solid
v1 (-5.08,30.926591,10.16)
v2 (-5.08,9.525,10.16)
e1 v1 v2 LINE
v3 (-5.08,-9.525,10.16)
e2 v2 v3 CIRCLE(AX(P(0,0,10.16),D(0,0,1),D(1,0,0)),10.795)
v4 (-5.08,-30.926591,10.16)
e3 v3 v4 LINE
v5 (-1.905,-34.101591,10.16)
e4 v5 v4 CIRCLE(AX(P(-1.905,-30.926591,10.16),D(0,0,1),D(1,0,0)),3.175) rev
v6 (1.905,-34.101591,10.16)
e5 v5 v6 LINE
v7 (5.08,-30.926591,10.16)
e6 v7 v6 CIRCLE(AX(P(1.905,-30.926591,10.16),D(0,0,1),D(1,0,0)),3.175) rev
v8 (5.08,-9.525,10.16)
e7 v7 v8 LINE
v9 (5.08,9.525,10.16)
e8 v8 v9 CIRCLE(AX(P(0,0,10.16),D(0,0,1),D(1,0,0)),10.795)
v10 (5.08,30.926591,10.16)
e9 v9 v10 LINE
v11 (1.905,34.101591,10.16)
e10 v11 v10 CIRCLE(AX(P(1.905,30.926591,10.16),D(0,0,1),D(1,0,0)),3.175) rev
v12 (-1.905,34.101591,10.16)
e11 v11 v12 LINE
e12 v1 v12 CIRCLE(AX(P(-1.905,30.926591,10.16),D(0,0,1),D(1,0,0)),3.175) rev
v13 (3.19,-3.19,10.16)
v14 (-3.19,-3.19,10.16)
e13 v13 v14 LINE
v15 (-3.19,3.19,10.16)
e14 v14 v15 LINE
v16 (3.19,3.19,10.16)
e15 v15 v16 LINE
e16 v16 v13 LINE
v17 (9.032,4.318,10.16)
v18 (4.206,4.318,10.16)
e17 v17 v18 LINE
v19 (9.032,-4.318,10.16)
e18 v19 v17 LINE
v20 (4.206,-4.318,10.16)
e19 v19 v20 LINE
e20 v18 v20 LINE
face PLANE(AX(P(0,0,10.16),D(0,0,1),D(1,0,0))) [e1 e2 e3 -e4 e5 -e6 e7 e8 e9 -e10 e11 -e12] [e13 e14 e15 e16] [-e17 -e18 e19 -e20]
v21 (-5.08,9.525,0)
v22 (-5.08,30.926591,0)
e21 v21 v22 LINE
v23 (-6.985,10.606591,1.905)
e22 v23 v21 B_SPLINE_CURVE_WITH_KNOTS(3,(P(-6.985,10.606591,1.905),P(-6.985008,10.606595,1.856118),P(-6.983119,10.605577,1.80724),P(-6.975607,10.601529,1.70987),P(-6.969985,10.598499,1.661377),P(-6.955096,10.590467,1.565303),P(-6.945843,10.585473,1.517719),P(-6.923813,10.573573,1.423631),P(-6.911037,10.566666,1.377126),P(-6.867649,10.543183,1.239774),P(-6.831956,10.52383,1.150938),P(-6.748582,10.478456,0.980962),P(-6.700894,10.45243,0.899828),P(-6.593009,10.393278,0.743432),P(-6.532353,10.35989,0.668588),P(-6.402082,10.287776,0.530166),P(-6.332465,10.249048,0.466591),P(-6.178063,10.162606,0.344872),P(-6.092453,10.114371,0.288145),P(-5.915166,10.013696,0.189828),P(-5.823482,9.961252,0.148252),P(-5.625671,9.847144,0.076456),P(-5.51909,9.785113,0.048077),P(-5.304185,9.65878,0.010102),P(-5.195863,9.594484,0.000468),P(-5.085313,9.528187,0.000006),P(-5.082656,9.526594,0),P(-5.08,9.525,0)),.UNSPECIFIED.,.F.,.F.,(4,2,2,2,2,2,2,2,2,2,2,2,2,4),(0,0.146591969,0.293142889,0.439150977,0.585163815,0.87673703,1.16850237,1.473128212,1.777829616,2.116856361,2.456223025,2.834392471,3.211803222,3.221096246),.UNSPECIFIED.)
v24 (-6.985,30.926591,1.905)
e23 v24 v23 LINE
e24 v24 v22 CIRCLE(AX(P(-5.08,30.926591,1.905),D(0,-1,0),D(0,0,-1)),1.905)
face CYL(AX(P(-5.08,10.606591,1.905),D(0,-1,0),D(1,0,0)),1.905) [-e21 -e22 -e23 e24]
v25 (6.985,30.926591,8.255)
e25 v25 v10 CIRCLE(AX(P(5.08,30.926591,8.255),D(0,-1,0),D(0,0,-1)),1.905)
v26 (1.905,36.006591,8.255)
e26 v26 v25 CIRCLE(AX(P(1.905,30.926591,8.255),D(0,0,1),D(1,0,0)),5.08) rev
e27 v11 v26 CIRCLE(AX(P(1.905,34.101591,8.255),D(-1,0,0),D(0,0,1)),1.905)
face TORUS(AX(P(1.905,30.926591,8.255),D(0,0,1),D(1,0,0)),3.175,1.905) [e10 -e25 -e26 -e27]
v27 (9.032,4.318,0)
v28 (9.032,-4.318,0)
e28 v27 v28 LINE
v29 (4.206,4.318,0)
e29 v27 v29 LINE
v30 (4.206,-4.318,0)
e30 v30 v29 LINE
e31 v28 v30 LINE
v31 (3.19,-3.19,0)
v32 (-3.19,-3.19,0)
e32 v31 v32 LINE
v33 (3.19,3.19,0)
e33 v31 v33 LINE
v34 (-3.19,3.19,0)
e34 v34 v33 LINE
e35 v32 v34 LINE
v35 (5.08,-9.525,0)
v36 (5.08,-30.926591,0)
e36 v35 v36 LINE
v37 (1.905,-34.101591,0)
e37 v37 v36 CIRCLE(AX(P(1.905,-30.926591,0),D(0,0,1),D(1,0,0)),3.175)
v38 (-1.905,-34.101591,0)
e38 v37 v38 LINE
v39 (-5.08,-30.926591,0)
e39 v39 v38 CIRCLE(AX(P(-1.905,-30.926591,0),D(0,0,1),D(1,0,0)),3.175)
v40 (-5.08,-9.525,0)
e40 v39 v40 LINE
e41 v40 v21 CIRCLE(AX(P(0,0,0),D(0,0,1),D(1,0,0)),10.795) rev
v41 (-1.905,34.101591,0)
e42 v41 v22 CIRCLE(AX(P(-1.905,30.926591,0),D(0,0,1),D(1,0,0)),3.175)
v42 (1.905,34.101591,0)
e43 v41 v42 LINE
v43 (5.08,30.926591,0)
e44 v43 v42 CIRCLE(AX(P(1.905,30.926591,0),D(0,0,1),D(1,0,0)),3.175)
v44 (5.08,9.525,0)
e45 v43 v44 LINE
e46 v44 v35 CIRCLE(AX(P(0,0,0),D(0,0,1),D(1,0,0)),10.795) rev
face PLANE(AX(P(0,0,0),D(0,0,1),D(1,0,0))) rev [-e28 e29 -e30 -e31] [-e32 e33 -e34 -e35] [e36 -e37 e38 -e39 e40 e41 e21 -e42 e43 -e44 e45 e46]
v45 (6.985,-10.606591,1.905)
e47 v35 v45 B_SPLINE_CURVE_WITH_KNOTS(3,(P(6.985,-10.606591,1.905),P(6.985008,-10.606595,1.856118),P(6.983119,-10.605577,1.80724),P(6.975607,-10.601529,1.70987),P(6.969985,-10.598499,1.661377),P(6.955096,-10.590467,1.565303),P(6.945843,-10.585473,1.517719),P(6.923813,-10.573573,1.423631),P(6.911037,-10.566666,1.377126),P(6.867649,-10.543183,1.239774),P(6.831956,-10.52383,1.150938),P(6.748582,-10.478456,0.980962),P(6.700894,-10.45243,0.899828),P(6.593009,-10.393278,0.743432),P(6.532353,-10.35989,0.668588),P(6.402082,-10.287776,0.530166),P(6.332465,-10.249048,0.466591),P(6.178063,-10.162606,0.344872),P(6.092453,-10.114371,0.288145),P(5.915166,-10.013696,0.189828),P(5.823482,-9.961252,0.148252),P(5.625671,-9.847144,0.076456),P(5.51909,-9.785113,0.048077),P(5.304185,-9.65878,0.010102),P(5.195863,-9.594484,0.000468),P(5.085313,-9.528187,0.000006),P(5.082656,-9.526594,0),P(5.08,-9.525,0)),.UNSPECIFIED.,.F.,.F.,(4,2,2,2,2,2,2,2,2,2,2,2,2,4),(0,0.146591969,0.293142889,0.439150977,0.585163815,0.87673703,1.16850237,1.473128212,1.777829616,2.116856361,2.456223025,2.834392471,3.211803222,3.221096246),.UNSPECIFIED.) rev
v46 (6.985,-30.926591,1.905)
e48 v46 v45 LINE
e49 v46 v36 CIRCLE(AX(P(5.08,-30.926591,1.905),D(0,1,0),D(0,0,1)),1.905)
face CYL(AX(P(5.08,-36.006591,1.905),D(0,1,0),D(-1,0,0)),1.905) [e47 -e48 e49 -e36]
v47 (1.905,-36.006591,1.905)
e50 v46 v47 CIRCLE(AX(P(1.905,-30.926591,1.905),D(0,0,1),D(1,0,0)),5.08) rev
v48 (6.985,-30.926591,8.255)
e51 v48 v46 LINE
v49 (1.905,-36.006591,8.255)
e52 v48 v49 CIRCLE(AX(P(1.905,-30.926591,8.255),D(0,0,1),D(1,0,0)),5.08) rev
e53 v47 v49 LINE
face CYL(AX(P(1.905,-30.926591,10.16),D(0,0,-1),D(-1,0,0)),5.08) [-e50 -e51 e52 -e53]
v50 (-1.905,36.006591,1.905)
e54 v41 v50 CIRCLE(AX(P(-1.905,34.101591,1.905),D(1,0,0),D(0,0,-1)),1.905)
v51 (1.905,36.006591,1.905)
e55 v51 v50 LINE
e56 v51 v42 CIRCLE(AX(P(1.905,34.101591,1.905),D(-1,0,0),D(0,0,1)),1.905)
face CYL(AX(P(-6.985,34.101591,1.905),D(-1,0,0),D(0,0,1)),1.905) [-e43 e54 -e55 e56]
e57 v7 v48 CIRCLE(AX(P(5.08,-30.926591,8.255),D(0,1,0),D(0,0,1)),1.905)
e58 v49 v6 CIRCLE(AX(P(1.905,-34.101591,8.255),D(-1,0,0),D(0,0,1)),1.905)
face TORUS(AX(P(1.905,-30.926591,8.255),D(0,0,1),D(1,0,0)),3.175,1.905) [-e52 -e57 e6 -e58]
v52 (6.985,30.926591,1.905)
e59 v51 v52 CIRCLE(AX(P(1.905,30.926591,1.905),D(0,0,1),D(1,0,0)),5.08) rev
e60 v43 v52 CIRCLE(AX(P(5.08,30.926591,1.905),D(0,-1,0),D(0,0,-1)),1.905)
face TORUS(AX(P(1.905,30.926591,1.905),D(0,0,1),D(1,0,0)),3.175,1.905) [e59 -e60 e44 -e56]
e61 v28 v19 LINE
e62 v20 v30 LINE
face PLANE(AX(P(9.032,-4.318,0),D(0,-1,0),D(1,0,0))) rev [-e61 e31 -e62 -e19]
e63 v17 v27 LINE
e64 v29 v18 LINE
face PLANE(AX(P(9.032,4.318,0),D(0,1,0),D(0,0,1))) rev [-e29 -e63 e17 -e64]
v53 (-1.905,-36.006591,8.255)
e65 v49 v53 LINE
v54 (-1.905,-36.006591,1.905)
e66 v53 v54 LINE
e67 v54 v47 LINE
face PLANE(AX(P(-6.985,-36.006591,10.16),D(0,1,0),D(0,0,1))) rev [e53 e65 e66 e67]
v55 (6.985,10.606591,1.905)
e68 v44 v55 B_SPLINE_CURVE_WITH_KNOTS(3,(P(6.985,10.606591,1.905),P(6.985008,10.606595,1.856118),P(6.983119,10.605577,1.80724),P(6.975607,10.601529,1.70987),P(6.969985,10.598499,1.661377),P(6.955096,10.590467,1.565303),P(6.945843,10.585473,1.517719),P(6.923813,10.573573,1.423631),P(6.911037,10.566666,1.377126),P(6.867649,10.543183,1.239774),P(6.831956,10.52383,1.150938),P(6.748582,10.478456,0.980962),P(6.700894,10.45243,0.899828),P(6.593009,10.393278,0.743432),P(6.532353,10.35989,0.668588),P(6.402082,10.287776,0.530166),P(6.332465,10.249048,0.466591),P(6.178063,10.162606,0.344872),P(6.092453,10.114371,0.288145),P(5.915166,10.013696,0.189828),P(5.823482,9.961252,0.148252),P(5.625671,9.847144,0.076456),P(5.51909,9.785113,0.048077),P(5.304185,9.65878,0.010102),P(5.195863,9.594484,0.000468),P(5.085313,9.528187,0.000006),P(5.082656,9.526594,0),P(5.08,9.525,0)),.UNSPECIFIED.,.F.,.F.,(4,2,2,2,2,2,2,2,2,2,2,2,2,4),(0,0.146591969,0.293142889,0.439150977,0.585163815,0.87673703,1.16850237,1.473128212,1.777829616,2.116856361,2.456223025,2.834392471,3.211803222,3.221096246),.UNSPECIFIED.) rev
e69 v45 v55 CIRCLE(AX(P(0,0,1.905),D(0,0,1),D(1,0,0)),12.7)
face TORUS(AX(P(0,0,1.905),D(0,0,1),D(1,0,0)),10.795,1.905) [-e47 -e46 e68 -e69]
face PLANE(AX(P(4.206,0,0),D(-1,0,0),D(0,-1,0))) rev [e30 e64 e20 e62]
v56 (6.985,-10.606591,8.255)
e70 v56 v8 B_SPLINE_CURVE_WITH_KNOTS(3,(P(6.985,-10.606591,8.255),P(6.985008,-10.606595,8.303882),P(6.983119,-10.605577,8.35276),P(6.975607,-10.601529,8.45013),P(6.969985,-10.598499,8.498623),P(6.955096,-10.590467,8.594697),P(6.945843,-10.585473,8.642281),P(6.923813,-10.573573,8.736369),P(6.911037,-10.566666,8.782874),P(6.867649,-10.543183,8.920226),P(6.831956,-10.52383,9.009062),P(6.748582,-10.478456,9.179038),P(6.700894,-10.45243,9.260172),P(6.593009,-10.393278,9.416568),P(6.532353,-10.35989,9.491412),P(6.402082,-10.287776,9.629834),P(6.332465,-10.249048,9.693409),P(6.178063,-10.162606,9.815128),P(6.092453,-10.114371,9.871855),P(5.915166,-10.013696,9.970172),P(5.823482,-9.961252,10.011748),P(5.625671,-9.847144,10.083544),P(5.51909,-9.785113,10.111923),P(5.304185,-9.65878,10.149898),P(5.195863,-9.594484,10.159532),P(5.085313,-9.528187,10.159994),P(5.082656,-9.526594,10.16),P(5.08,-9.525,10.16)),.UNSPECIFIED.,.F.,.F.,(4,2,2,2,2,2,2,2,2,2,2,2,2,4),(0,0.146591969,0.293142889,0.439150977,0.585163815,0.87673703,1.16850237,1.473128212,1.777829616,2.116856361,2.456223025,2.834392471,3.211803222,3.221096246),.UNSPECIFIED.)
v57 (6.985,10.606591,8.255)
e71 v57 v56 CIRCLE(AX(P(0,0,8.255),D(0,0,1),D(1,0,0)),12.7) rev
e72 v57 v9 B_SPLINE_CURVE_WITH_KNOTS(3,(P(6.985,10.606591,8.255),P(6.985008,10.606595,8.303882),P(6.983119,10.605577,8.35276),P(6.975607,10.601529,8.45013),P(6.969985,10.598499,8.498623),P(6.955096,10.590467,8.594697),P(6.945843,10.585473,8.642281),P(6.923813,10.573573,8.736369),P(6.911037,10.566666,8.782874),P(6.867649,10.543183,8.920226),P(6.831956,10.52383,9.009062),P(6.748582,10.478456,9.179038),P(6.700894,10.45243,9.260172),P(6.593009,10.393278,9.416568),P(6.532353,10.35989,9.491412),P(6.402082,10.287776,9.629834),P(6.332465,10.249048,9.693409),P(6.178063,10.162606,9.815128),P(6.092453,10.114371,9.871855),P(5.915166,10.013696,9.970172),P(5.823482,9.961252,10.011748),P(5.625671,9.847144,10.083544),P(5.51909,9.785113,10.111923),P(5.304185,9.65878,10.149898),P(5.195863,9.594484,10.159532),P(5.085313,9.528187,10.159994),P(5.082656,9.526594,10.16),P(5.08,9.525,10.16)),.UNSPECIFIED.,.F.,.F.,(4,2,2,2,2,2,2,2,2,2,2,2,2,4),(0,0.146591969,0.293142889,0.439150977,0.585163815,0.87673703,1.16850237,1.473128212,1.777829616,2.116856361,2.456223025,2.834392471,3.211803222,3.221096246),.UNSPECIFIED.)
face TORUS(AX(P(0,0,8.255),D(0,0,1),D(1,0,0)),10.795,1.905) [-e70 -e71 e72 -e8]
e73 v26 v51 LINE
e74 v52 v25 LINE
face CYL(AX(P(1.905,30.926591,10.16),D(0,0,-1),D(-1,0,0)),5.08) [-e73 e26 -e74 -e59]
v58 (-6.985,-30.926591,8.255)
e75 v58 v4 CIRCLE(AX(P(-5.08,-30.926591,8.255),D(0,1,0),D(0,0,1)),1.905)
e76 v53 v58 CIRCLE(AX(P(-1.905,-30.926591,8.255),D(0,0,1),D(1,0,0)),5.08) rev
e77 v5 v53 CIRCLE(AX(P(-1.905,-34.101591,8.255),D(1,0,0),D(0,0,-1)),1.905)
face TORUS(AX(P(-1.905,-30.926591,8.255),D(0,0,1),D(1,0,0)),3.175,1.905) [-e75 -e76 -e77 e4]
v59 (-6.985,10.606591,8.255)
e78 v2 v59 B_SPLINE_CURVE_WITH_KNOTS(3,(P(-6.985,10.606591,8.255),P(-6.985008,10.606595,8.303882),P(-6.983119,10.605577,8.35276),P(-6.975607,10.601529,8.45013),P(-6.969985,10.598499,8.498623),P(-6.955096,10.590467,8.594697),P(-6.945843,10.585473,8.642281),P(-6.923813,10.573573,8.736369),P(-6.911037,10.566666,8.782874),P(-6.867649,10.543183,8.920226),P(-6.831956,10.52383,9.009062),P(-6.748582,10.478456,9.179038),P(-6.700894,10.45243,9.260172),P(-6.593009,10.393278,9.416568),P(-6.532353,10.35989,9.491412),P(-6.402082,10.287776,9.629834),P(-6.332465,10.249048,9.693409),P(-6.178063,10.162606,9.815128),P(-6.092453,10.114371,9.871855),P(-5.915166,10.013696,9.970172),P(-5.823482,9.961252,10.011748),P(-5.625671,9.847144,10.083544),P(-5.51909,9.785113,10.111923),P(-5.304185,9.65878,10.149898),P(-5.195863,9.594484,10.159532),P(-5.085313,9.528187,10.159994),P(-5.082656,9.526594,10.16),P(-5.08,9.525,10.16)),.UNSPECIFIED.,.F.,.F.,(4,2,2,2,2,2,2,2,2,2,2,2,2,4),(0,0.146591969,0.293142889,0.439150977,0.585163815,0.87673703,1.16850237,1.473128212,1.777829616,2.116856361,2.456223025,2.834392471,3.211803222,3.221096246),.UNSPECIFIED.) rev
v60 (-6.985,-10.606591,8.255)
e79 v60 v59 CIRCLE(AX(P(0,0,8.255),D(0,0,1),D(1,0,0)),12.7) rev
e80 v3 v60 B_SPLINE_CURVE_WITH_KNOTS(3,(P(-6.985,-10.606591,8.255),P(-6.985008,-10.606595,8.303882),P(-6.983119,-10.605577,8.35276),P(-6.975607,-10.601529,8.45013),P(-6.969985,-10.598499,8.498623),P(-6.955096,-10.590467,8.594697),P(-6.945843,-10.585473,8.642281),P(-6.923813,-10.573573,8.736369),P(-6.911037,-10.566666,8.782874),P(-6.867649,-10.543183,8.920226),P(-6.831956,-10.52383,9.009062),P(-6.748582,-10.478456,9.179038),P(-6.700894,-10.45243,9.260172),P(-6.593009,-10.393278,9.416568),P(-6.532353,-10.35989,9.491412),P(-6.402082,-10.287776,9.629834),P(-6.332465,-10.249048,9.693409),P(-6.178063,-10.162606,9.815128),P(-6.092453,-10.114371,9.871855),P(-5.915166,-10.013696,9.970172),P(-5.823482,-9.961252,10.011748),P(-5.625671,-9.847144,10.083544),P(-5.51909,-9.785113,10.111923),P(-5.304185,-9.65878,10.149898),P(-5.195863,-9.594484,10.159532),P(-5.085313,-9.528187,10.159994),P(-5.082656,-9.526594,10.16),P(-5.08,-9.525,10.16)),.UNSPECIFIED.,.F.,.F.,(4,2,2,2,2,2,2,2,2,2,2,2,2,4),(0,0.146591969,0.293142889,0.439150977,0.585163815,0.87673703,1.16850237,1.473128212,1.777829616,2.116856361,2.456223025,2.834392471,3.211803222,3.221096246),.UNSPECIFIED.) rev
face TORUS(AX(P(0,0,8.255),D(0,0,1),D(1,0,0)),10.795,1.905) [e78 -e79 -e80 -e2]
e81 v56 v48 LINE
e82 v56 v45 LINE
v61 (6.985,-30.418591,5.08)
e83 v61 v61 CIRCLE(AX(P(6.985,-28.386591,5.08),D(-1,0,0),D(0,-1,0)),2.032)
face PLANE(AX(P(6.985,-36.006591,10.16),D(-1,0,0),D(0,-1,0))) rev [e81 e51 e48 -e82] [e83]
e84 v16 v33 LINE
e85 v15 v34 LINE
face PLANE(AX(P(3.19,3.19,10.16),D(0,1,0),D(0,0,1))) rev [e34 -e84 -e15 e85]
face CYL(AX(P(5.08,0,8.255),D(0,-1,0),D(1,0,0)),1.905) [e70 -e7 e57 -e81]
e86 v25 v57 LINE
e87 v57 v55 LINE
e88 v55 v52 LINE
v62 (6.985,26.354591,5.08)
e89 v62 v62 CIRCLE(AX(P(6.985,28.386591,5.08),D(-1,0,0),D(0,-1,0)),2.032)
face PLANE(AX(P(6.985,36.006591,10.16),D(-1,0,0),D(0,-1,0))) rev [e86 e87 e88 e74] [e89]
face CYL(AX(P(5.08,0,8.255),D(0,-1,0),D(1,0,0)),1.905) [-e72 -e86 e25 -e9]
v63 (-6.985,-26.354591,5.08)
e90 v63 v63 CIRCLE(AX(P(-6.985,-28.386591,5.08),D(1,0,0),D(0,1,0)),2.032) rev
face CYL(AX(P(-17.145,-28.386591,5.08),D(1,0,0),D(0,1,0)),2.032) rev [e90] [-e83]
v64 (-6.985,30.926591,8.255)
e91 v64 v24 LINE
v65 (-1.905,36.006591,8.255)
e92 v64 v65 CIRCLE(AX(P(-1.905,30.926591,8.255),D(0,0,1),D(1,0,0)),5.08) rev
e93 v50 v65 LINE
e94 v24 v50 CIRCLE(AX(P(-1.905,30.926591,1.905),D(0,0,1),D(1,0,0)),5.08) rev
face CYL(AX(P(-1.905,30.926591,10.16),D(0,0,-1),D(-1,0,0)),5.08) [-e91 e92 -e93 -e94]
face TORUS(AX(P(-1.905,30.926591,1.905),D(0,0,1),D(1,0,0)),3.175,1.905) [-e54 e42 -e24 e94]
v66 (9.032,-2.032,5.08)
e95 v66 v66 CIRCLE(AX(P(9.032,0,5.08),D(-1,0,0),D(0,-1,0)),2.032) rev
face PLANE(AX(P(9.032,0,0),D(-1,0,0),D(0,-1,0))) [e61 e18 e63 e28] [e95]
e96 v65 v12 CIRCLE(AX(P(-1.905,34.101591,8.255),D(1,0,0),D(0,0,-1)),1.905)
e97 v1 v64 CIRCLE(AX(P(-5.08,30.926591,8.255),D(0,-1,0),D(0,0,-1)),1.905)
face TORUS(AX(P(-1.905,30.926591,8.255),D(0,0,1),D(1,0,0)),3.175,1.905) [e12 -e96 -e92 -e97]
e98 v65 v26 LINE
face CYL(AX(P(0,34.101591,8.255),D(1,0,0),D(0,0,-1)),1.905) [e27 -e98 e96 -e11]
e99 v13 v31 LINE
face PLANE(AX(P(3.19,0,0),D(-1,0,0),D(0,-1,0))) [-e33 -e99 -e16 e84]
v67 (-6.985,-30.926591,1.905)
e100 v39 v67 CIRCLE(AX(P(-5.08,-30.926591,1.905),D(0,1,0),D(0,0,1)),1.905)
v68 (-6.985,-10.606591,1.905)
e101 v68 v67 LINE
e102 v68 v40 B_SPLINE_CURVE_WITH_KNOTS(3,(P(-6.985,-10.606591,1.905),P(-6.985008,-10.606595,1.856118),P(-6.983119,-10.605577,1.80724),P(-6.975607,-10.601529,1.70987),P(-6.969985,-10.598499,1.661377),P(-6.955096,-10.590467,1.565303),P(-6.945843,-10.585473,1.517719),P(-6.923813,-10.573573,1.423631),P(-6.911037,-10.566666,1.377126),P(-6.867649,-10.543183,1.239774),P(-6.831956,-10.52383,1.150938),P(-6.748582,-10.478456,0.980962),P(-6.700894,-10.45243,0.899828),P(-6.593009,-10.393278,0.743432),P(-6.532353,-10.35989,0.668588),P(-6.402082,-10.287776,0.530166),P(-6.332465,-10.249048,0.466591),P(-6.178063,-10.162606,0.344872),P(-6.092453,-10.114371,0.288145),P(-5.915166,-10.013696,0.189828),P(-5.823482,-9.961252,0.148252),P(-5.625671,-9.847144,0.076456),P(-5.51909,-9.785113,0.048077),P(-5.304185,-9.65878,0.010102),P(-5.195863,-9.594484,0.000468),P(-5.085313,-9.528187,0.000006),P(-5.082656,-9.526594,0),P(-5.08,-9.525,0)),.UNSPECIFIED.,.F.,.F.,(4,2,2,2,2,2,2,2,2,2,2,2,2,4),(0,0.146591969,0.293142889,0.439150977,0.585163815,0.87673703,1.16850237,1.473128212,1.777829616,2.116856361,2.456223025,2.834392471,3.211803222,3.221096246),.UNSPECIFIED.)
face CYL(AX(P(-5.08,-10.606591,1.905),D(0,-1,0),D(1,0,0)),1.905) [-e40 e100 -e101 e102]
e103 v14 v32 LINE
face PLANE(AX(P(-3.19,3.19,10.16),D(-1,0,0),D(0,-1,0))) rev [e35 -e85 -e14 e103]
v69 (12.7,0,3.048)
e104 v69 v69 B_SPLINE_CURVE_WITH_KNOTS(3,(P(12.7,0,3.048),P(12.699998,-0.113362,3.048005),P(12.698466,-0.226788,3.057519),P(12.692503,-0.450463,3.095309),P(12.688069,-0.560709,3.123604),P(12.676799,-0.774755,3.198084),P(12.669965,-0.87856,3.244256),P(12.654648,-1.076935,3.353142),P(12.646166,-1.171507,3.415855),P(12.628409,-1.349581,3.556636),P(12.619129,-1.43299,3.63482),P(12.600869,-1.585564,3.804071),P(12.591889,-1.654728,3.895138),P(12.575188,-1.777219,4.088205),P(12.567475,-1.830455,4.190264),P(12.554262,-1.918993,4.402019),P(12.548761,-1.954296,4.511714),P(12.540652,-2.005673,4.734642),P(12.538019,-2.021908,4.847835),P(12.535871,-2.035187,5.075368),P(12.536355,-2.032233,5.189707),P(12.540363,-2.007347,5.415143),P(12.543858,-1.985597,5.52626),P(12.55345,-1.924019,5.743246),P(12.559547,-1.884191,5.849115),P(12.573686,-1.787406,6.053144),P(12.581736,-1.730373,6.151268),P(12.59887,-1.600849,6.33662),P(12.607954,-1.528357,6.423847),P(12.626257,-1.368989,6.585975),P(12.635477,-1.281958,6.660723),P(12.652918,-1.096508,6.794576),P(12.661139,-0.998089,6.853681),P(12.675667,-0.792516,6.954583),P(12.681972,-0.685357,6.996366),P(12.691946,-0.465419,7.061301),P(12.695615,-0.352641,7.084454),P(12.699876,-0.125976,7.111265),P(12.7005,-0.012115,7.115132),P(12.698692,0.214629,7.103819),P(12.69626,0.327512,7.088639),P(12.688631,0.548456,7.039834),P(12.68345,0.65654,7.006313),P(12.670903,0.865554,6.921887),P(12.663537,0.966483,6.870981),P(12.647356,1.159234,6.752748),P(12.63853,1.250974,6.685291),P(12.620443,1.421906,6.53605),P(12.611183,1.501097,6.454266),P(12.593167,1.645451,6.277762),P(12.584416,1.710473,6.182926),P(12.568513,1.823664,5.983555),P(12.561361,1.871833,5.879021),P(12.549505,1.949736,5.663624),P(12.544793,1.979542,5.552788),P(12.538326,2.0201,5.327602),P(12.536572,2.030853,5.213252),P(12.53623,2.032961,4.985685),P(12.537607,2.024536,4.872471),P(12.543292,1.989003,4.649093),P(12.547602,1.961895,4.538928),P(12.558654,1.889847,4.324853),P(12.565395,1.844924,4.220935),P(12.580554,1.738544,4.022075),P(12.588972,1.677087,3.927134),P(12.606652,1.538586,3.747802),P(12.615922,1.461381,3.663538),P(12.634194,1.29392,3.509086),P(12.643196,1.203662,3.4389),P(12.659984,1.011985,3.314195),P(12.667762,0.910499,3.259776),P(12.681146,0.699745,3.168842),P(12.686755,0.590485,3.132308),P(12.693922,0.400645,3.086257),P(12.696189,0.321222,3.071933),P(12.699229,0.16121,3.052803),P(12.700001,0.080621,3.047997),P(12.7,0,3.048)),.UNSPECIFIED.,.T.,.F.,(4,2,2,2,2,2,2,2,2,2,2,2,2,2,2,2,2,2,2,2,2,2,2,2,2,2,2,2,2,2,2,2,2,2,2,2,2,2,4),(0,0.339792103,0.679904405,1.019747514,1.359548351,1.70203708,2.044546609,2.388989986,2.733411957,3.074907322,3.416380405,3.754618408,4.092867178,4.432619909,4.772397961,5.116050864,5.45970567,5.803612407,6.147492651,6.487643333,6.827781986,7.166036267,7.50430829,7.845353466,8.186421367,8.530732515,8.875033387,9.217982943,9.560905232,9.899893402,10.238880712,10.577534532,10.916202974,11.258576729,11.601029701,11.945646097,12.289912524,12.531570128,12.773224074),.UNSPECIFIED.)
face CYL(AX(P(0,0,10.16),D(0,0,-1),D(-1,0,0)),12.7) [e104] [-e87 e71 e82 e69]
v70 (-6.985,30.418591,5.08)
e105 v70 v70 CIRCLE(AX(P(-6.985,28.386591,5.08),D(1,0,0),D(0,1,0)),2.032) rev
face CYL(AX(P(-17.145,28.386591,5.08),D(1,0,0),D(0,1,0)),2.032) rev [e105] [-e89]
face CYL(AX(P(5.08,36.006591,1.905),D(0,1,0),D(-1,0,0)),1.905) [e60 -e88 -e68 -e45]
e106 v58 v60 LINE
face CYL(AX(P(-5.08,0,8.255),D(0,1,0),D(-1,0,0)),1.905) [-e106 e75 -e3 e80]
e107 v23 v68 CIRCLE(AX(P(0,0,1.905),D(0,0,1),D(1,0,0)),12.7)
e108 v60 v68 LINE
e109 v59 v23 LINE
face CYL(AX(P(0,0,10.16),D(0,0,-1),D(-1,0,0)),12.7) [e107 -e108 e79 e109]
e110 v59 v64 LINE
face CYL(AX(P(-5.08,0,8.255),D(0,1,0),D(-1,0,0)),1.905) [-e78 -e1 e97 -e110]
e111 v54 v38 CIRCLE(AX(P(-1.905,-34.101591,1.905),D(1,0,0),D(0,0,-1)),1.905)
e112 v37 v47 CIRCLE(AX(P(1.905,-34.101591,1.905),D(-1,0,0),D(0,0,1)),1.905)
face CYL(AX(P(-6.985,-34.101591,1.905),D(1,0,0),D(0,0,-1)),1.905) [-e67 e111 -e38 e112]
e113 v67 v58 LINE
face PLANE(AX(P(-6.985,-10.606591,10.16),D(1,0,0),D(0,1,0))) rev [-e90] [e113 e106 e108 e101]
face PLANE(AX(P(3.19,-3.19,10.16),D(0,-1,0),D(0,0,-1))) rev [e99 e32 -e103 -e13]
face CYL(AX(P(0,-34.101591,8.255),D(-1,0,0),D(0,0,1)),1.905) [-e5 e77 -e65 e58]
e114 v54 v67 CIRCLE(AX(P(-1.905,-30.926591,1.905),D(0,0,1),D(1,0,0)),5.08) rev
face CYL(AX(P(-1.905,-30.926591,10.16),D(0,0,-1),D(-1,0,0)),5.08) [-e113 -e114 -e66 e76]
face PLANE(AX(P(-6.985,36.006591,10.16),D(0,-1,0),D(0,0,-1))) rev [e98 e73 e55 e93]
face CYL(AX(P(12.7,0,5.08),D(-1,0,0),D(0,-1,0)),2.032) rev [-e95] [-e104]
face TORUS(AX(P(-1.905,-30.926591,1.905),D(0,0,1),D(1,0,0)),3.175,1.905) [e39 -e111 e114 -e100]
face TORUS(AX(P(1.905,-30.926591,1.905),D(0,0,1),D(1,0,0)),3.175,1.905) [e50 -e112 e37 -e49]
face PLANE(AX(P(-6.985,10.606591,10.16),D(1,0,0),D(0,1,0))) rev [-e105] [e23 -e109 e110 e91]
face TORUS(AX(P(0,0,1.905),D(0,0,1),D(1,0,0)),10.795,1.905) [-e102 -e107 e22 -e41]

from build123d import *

# Parameters (mm, degrees)
SKETCH2_R           = 2.032
BOSS_EXTRUDE1_DEPTH = 10.16
SKETCH3_W           = 6.38
SKETCH3_H           = 6.38
CUT_EXTRUDE1_DEPTH  = 40.509368553
SKETCH4_R           = 2.032
CUT_EXTRUDE2_DEPTH  = 24.13
FILLET3_R           = 1.905
FILLET1_R           = 5.08
SKETCH5_R           = 2.032
CUT_EXTRUDE3_DEPTH  = 41.64716852
SKETCH7_W           = 10.16
SKETCH7_H           = 8.636
CUT_EXTRUDE4_DEPTH  = 5.842
SKETCH8_W           = 10.16
SKETCH8_H           = 8.636
BOSS_EXTRUDE2_DEPTH = 1.016


with BuildPart() as part:
    # Sketch2 → Boss-Extrude1 (new body)
    with BuildSketch(Plane.XY):
        with BuildLine():
            Line((-6.985, 10.606591111), (-6.985, 36.006591111))
            Line((-6.985, 36.006591111), (6.985, 36.006591111))
            Line((6.985, 36.006591111), (6.985, 10.606591111))
            ThreePointArc((6.985, 10.606591111), (12.7, 0), (6.985, -10.606591111))
            Line((6.985, -10.606591111), (6.985, -36.006591111))
            Line((6.985, -36.006591111), (-6.985, -36.006591111))
            Line((-6.985, -36.006591111), (-6.985, -10.606591111))
            ThreePointArc((-6.985, -10.606591111), (-12.7, 0), (-6.985, 10.606591111))
        make_face()
        Circle(SKETCH2_R, mode=Mode.SUBTRACT)
    extrude(amount=BOSS_EXTRUDE1_DEPTH)

    # Sketch3 → Cut-Extrude1 (cut, through all)
    with BuildSketch(Plane(origin=(0, 0, 0), x_dir=(-1, 0, 0), z_dir=(0, 0, -1))):
        Rectangle(SKETCH3_W, SKETCH3_H)
    extrude(amount=-CUT_EXTRUDE1_DEPTH, mode=Mode.SUBTRACT)

    # Sketch4 → Cut-Extrude2 (cut)
    with BuildSketch(Plane(origin=(6.985, 0, 3.175), x_dir=(0, 0, 1), z_dir=(-1, 0, 0))):
        with Locations(Location((1.905, 28.386591111, 0), (0, 0, 90))):
            Circle(SKETCH4_R)
        with Locations(Location((1.905, -28.386591111, 0), (0, 0, 90))):
            Circle(SKETCH4_R)
    extrude(amount=CUT_EXTRUDE2_DEPTH, mode=Mode.SUBTRACT)

    # Fillet3
    fillet3_edges = [part.edges().sort_by_distance(p)[0] for p in [
        (6.985, 23.306591111, 0),
        (12.7, 0, 0),
        (6.985, -23.306591111, 0),
        (0, -36.006591111, 0),
        (12.7, 0, 10.16),
        (6.985, 23.306591111, 10.16),
        (0, 36.006591111, 10.16),
        (-6.985, 23.306591111, 10.16),
        (-12.7, 0, 10.16),
        (-6.985, -23.306591111, 10.16),
        (0, -36.006591111, 10.16),
        (-6.985, -23.306591111, 0),
        (6.985, -23.306591111, 10.16),
        (-12.7, 0, 0),
        (-6.985, 23.306591111, 0),
        (0, 36.006591111, 0),
    ]]
    fillet(fillet3_edges, radius=FILLET3_R)

    # Fillet1
    # the kernel refuses this fillet: 5.08 mm, written as the material it takes off along each edge
    with BuildSketch(Plane(origin=(-1.905, 30.926591111, 0), x_dir=(-1, 0, 0), z_dir=(0, -1, 0))) as fillet1_piece_1:
        with BuildLine():
            CenterArc((3.175, -1.905), 1.905, 0, 90)
            Line((5.08, -1.905), (5.08, 0))
            Line((5.08, 0), (3.175, 0))
        make_face()
    revolve(axis=Axis((-1.905, 30.926591111, 0), (0, 0, -1)), revolution_arc=90, mode=Mode.SUBTRACT)
    with BuildSketch(Plane(origin=(1.905, 30.926591111, 0), x_dir=(0, 1, 0), z_dir=(-1, 0, 0))) as fillet1_piece_2:
        with BuildLine():
            CenterArc((3.175, -1.905), 1.905, 0, 90)
            Line((5.08, -1.905), (5.08, 0))
            Line((5.08, 0), (3.175, 0))
        make_face()
    revolve(axis=Axis((1.905, 30.926591111, 0), (0, 0, -1)), revolution_arc=90, mode=Mode.SUBTRACT)
    with BuildSketch(Plane(origin=(-1.905, -30.926591111, 0), x_dir=(0, -1, 0), z_dir=(1, 0, 0))) as fillet1_piece_3:
        with BuildLine():
            CenterArc((3.175, -1.905), 1.905, 0, 90)
            Line((5.08, -1.905), (5.08, 0))
            Line((5.08, 0), (3.175, 0))
        make_face()
    revolve(axis=Axis((-1.905, -30.926591111, 0), (0, 0, -1)), revolution_arc=90, mode=Mode.SUBTRACT)
    with BuildSketch(Plane(origin=(1.905, -30.926591111, 0), x_dir=(1, 0, 0), z_dir=(0, 1, 0))) as fillet1_piece_4:
        with BuildLine():
            CenterArc((3.175, -1.905), 1.905, 0, 90)
            Line((5.08, -1.905), (5.08, 0))
            Line((5.08, 0), (3.175, 0))
        make_face()
    revolve(axis=Axis((1.905, -30.926591111, 0), (0, 0, -1)), revolution_arc=90, mode=Mode.SUBTRACT)
    with BuildSketch(Plane(origin=(-1.905, 30.926591111, 10.16), x_dir=(0, 1, 0), z_dir=(1, 0, 0))) as fillet1_piece_5:
        with BuildLine():
            CenterArc((3.175, -1.905), 1.905, 0, 90)
            Line((5.08, -1.905), (5.08, 0))
            Line((5.08, 0), (3.175, 0))
        make_face()
    revolve(axis=Axis((-1.905, 30.926591111, 10.16), (0, 0, 1)), revolution_arc=90, mode=Mode.SUBTRACT)
    with BuildSketch(Plane(origin=(1.905, 30.926591111, 10.16), x_dir=(1, 0, 0), z_dir=(0, -1, 0))) as fillet1_piece_6:
        with BuildLine():
            CenterArc((3.175, -1.905), 1.905, 0, 90)
            Line((5.08, -1.905), (5.08, 0))
            Line((5.08, 0), (3.175, 0))
        make_face()
    revolve(axis=Axis((1.905, 30.926591111, 10.16), (0, 0, 1)), revolution_arc=90, mode=Mode.SUBTRACT)
    with BuildSketch(Plane(origin=(-1.905, -30.926591111, 10.16), x_dir=(-1, 0, 0), z_dir=(0, 1, 0))) as fillet1_piece_7:
        with BuildLine():
            CenterArc((3.175, -1.905), 1.905, 0, 90)
            Line((5.08, -1.905), (5.08, 0))
            Line((5.08, 0), (3.175, 0))
        make_face()
    revolve(axis=Axis((-1.905, -30.926591111, 10.16), (0, 0, 1)), revolution_arc=90, mode=Mode.SUBTRACT)
    with BuildSketch(Plane(origin=(1.905, -30.926591111, 10.16), x_dir=(0, -1, 0), z_dir=(-1, 0, 0))) as fillet1_piece_8:
        with BuildLine():
            CenterArc((3.175, -1.905), 1.905, 0, 90)
            Line((5.08, -1.905), (5.08, 0))
            Line((5.08, 0), (3.175, 0))
        make_face()
    revolve(axis=Axis((1.905, -30.926591111, 10.16), (0, 0, 1)), revolution_arc=90, mode=Mode.SUBTRACT)
    with BuildSketch(Plane(origin=(6.985, -36.006591111, 0), x_dir=(-1, 0, 0), z_dir=(0, 0, 1)), Plane(origin=(-6.985, -36.006591111, 0), x_dir=(0, 1, 0), z_dir=(0, 0, 1))) as fillet1_piece_9:
        with BuildLine():
            CenterArc((FILLET1_R, -FILLET1_R), FILLET1_R, 90, 90)
            Line((0, -FILLET1_R), (0, 0))
            Line((0, 0), (FILLET1_R, 0))
        make_face()
    extrude(amount=10.16, mode=Mode.SUBTRACT)
    with BuildSketch(Plane(origin=(-6.985, 36.006591111, 0), x_dir=(0, -1, 0), z_dir=(0, 0, 1)), Plane(origin=(6.985, 36.006591111, 0), x_dir=(-1, 0, 0), z_dir=(0, 0, 1))) as fillet1_piece_10:
        with BuildLine():
            CenterArc((FILLET1_R, FILLET1_R), FILLET1_R, 180, 90)
            Line((0, FILLET1_R), (0, 0))
            Line((0, 0), (FILLET1_R, 0))
        make_face()
    extrude(amount=10.16, mode=Mode.SUBTRACT)

    # Sketch5 → Cut-Extrude3 (cut, through all)
    with BuildSketch(Plane.ZY.offset(-3.19)):
        with Locations(Location((5.08, 0, 0), (0, 0, 270))):
            Circle(SKETCH5_R)
    extrude(amount=-CUT_EXTRUDE3_DEPTH, mode=Mode.SUBTRACT)

    # Sketch7 → Cut-Extrude4 (cut)
    with BuildSketch(Plane.ZY.offset(-3.19)):
        with Locations((5.08, 0)):
            Rectangle(SKETCH7_W, SKETCH7_H)
    extrude(amount=-CUT_EXTRUDE4_DEPTH, mode=Mode.SUBTRACT)

    # Sketch8 → Boss-Extrude2 (add)
    with BuildSketch(Plane(origin=(3.19, 0, 0), x_dir=(0, 0, -1), z_dir=(1, 0, 0))):
        with Locations((-5.08, 0)):
            Rectangle(SKETCH8_W, SKETCH8_H)
    extrude(amount=BOSS_EXTRUDE2_DEPTH)


solid = part.part
